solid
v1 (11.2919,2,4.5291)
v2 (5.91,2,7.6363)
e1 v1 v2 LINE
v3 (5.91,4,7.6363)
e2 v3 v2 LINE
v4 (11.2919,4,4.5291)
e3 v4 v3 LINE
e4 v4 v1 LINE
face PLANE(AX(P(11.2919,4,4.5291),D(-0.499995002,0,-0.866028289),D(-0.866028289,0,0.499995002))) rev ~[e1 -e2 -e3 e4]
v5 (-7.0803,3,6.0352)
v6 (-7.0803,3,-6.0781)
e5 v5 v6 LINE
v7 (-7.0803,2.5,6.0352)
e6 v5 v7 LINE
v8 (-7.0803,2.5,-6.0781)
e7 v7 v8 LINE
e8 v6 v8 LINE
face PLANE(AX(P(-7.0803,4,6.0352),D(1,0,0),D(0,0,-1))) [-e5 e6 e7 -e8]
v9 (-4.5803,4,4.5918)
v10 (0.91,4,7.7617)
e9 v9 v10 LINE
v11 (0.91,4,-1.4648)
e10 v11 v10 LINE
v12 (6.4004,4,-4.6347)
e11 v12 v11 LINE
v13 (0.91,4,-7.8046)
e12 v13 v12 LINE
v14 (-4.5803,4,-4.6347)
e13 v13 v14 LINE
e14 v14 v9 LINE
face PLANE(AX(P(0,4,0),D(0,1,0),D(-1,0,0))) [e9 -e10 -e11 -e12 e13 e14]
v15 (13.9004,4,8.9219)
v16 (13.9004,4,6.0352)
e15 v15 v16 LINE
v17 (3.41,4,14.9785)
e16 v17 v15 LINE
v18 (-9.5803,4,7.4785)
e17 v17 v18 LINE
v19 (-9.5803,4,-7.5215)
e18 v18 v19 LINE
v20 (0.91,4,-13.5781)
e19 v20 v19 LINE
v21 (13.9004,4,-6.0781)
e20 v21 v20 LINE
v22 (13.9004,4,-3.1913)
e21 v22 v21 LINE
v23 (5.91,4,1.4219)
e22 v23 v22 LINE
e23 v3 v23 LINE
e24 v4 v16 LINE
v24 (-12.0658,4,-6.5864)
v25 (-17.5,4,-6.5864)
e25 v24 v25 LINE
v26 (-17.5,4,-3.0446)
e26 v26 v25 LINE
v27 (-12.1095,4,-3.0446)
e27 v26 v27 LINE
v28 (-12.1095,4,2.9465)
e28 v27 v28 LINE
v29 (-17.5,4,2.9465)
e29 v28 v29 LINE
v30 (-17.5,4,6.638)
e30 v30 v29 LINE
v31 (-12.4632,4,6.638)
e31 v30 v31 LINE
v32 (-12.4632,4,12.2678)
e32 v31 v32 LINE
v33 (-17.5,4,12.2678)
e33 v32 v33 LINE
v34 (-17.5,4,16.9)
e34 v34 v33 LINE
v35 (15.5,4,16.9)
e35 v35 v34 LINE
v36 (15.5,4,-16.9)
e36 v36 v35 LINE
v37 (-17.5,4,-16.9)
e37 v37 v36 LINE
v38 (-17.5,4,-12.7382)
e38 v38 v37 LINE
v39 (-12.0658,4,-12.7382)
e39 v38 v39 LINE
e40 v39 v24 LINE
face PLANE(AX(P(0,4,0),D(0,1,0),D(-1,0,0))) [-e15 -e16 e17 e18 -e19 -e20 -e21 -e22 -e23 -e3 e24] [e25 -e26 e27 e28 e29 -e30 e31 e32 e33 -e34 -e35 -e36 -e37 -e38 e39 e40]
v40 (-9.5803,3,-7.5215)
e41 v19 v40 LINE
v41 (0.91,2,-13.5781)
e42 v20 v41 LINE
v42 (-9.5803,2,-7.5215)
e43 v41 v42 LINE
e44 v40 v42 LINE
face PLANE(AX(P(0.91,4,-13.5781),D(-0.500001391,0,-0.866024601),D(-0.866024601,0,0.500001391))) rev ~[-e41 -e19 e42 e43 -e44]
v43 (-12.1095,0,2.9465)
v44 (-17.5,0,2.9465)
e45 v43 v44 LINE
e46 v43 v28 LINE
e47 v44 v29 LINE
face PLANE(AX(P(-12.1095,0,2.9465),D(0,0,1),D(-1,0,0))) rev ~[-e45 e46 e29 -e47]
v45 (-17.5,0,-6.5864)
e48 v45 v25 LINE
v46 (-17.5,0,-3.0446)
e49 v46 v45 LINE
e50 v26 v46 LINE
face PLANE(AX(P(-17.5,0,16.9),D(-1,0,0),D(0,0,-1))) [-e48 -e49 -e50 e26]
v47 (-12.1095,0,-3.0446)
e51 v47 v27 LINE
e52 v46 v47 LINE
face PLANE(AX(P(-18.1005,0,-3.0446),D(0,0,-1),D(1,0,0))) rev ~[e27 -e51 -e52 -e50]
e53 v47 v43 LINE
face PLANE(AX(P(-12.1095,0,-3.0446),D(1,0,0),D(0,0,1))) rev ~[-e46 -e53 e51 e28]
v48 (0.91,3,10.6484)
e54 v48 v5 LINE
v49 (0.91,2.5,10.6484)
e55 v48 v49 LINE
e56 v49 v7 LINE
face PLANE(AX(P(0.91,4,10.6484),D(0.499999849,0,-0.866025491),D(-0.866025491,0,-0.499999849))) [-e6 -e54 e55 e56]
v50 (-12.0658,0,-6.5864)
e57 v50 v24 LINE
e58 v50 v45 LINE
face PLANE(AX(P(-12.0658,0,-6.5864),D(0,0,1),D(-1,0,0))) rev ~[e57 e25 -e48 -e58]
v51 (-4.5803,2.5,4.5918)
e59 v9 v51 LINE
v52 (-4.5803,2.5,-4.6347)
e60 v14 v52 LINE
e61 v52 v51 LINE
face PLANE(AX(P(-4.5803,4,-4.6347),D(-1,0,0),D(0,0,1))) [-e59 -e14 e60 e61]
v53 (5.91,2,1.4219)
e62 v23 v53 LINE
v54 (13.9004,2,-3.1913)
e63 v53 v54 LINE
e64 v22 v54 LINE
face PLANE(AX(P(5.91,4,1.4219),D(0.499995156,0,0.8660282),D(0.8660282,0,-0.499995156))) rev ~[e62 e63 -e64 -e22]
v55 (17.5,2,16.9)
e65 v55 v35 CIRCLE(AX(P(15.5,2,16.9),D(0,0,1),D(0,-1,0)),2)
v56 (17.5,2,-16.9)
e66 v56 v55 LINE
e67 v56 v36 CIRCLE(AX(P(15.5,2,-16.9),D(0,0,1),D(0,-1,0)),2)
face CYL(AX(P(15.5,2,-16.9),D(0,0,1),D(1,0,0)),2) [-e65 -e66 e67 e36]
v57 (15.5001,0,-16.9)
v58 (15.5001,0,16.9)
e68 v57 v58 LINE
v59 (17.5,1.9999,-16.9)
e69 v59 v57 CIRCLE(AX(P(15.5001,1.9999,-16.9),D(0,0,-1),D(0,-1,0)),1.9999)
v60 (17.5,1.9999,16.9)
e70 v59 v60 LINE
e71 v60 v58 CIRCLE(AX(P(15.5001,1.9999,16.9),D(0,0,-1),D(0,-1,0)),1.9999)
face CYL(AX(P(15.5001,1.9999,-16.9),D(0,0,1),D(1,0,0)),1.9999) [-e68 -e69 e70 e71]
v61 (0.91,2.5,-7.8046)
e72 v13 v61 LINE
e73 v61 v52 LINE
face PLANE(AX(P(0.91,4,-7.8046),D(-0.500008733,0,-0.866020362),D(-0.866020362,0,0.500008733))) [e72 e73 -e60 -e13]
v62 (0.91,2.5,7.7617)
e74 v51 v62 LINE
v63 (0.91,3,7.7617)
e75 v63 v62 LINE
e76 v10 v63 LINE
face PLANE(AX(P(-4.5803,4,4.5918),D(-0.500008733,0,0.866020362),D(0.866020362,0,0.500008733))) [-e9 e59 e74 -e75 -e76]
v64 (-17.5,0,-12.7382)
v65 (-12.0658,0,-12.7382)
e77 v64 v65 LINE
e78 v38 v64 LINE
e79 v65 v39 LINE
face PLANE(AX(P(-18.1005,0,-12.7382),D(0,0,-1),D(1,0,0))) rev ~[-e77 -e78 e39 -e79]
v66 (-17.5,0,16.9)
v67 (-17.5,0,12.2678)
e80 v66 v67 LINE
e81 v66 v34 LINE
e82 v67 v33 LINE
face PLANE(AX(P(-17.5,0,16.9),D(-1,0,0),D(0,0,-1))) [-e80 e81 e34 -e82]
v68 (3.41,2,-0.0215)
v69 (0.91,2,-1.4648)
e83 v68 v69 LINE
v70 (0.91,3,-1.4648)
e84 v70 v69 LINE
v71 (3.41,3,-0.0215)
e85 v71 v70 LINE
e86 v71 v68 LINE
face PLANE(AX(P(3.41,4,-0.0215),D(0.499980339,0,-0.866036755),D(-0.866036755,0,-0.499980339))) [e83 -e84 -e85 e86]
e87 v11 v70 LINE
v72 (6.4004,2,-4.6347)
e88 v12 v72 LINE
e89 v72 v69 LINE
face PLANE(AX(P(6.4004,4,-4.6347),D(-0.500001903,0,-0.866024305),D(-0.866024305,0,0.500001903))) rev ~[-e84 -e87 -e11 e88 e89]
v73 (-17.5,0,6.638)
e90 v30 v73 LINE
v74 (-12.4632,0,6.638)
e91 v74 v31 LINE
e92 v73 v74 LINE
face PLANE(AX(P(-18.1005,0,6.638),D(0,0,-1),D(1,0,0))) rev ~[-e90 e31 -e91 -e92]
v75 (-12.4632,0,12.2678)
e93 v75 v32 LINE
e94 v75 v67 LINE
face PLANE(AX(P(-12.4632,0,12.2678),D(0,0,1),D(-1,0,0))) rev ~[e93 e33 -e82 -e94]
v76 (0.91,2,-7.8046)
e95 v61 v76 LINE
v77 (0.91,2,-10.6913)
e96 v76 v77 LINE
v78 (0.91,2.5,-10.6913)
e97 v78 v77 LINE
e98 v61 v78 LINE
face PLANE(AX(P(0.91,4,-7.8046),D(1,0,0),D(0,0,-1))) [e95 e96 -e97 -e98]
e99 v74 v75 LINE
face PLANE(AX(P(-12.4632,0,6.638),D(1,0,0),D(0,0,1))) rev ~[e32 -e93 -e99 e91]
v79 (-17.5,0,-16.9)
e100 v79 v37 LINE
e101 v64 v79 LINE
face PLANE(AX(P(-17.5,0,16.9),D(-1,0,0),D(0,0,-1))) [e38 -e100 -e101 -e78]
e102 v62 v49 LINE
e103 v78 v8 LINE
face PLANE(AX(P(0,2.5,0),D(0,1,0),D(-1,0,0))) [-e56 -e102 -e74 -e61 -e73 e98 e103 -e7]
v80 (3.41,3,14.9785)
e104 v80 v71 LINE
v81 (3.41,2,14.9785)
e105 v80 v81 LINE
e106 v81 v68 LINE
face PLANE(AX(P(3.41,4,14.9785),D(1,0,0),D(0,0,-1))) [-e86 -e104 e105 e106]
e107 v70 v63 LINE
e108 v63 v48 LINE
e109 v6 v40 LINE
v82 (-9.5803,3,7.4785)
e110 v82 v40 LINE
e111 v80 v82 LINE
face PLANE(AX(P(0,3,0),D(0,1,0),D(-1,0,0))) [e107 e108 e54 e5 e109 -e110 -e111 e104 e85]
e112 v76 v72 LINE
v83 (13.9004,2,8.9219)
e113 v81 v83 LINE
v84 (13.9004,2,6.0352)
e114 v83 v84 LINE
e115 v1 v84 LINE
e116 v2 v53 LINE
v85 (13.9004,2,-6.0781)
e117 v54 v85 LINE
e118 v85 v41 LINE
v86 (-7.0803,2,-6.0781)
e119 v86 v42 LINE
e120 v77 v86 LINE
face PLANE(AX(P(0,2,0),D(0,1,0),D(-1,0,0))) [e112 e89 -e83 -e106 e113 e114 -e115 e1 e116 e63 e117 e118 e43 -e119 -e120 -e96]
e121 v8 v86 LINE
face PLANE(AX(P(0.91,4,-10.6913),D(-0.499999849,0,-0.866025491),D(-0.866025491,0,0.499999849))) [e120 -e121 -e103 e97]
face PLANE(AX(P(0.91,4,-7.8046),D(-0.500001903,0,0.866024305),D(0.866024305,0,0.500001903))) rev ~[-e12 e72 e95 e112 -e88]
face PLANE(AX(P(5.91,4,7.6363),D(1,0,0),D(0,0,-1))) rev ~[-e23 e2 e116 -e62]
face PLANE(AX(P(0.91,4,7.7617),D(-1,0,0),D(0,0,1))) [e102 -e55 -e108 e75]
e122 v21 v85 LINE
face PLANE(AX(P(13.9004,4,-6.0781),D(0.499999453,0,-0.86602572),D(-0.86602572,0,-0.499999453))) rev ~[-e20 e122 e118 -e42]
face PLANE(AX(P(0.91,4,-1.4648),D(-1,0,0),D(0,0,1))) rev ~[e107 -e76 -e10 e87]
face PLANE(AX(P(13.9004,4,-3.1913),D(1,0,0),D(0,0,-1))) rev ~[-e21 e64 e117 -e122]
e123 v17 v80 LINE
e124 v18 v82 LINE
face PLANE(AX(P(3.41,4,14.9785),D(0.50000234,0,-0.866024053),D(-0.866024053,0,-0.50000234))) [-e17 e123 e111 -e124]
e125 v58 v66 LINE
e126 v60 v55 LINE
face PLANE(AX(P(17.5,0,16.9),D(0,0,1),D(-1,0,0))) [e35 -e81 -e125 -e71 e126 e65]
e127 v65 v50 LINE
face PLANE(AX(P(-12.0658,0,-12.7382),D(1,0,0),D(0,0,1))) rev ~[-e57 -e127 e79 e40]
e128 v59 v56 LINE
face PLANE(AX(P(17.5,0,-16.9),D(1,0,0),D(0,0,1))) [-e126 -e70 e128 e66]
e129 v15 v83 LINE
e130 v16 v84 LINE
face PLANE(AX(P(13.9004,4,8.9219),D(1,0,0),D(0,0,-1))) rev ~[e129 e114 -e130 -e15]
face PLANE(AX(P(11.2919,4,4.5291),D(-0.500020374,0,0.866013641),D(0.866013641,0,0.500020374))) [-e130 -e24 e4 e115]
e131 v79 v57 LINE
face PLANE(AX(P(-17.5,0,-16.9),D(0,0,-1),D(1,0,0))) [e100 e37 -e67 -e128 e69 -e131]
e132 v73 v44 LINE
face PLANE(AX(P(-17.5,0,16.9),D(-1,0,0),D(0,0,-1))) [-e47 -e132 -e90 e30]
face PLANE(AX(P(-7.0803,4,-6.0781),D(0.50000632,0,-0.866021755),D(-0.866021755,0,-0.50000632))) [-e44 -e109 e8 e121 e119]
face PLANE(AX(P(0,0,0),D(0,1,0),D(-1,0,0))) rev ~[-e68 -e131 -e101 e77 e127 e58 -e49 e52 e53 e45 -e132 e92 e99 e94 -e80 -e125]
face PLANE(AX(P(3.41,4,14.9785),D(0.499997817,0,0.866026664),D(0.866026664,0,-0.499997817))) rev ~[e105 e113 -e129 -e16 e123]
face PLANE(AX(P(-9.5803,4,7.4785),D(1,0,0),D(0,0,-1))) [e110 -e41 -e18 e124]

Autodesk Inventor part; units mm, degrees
ref_plane "YZ Plane" through (0, 0, 0) normal (1, 0, 0) x (0, 1, 0)
ref_plane "XZ Plane" through (0, 0, 0) normal (0, 1, 0) x (-1, 0, 0)
ref_plane "XY Plane" through (0, 0, 0) normal (0, 0, 1) x (1, 0, 0)
sketch "Sketch1" plane through (0, 0, 0) normal (0, 1, 0) x (-1, 0, 0)
  line L0 (-17.5, 16.9) -> (17.5, 16.9)
  line L1 (17.5, 16.9) -> (17.5, -16.9)
  line L2 (17.5, -16.9) -> (-17.5, -16.9)
  line L3 (-17.5, -16.9) -> (-17.5, 16.9)
  line L4 (-17.5, 16.9) -> (17.5, -16.9) construction
  line L5 (17.5, 16.9) -> (-17.5, -16.9) construction
  point P0 (0, 0)
sketch "Sketch2" plane through (0, 0, 0) normal (0, 1, 0) x (-1, 0, 0)
  line L0 (980.2308, 0) -> (977.7308, 0)
  line L1 (17.4632, -0.049) -> (15.105, -0.049)
  line L2 (12.1095, 2.9465) -> (18.1005, 2.9465)
  line L3 (18.1005, 2.9465) -> (18.1005, -3.0446)
  line L4 (18.1005, -3.0446) -> (12.1095, -3.0446)
  line L5 (12.1095, -3.0446) -> (12.1095, 2.9465)
  line L6 (12.1095, 2.9465) -> (18.1005, -3.0446) construction
  line L7 (18.1005, 2.9465) -> (12.1095, -3.0446) construction
  line L8 (12.4632, 12.2678) -> (18.1005, 12.2678)
  line L9 (18.1005, 12.2678) -> (18.1005, 6.638)
  line L10 (18.1005, 6.638) -> (12.4632, 6.638)
  line L11 (12.4632, 6.638) -> (12.4632, 12.2678)
  line L12 (12.4632, 12.2678) -> (18.1005, 6.638) construction
  line L13 (12.0658, -6.5864) -> (18.1005, -6.5864)
  line L14 (18.1005, -6.5864) -> (18.1005, -12.7382)
  line L15 (18.1005, -12.7382) -> (12.0658, -12.7382)
  line L16 (12.0658, -12.7382) -> (12.0658, -6.5864)
  line L17 (12.0658, -6.5864) -> (18.1005, -12.7382) construction
  line L18 (18.1005, -6.5864) -> (12.0658, -12.7382) construction
  point P0 (0, 0)
  dimension "d2" = 2.5
extrude "Extrusion1" add sketch "Sketch1" along normal blind 4
extrude "Extrusion2" cut sketch "Sketch2" along normal blind 4
fillet "Fillet3" radius 2 1 edges at (17.5, 4, 0)
fillet "Fillet4" radius 2 1 edges at (17.5, 0, 0)
sketch "Sketch3" plane through (0, 4, 0) normal (0, 1, 0) x (1, 0, 0)
  line L0 (-17.5, 3.0446) -> (-12.1095, 3.0446) construction
  line L1 (-12.1095, 3.0446) -> (-12.1095, -2.9465) construction
  line L2 (-12.1095, -2.9465) -> (-17.5, -2.9465) construction
  line L3 (-17.5, -2.9465) -> (-17.5, -6.638) construction
  line L4 (-17.5, -6.638) -> (-12.4632, -6.638) construction
  line L5 (-12.4632, -6.638) -> (-12.4632, -12.2678) construction
  line L6 (-12.4632, -12.2678) -> (-17.5, -12.2678) construction
  line L7 (-17.5, -12.2678) -> (-17.5, -16.9) construction
  line L8 (-17.5, -16.9) -> (15.5, -16.9) construction
  line L9 (15.5, 16.9) -> (-17.5, 16.9) construction
  line L10 (-17.5, 16.9) -> (-17.5, 12.7382) construction
  line L11 (-17.5, 12.7382) -> (-12.0658, 12.7382) construction
  line L12 (-12.0658, 12.7382) -> (-12.0658, 6.5864) construction
  line L13 (-12.0658, 6.5864) -> (-17.5, 6.5864) construction
  line L14 (-17.5, 6.5864) -> (-17.5, 3.0446) construction
  line L15 (-12.1095, 0.049) -> (15.5, 0) construction
  line L16 (-17.5, 16.9) -> (17.5, 16.9) construction
  line L17 (17.5, -16.9) -> (-17.5, -16.9) construction
  line L18 (-9.5803, 7.5215) -> (-9.5803, -7.4785)
  line L19 (-9.5803, -7.4785) -> (3.41, -14.9785)
  line L20 (-9.5803, 7.5215) -> (-7.0803, 6.0781)
  line L21 (-7.0803, 6.0781) -> (-7.0803, -6.0352)
  line L22 (-7.0803, -6.0352) -> (0.91, -10.6484)
  line L23 (0.91, -10.6484) -> (0.91, 1.4648)
  line L24 (0.91, 1.4648) -> (3.41, 0.0215)
  line L25 (3.41, 0.0215) -> (3.41, -14.9785)
  line L26 (15.5, 16.9) -> (15.5, -16.9) projected
  line L27 (3.41, 16.9) -> (3.41, -16.9) construction
  line L28 (-17.5, -16.9) -> (15.5, -16.9) construction
  line L29 (15.5, 16.9) -> (15.5, 16.9) construction
  line L30 (15.5, 16.9) -> (15.5, -16.9) construction
  line L31 (15.5, -16.9) -> (15.5, -16.9) construction
  line L32 (15.5, -16.9) -> (15.5, 16.9) construction
  dimension "d23" = 2.5
  dimension "d24" = 2.5
  dimension "d25" = 2.5
  dimension "d26" = 15
  dimension "d28" = 15
emboss "Emboss1" sketch "Sketch3" operation cut depth 1 direction (0, -1, 0)
sketch "Sketch4" plane through (0, 4, 0) normal (0, 1, 0) x (1, 0, 0)
  line L0 (-9.5803, 7.5215) -> (-7.0803, 6.0781) construction
  line L1 (-7.0803, 6.0781) -> (-7.0803, -6.0352) construction
  line L2 (-7.0803, -6.0352) -> (0.91, -10.6484) construction
  line L3 (0.91, -10.6484) -> (0.91, 1.4648) construction
  line L4 (0.91, 1.4648) -> (3.41, 0.0215) construction
  line L5 (3.41, 0.0215) -> (3.41, -14.9785) construction
  line L6 (3.41, -14.9785) -> (-9.5803, -7.4785) construction
  line L7 (-9.5803, -7.4785) -> (-9.5803, 7.5215) construction
  line L8 (15.5, 16.9) -> (15.5, -16.9) construction
  line L9 (15.5, 16.9) -> (-17.5, 16.9) construction
  line L10 (-17.5, 16.9) -> (-17.5, 12.7382) construction
  line L11 (-17.5, 12.7382) -> (-12.0658, 12.7382) construction
  line L12 (-12.0658, 12.7382) -> (-12.0658, 6.5864) construction
  line L13 (-12.0658, 6.5864) -> (-17.5, 6.5864) construction
  line L14 (-17.5, 6.5864) -> (-17.5, 3.0446) construction
  line L15 (-17.5, 3.0446) -> (-12.1095, 3.0446) construction
  line L16 (-12.1095, 3.0446) -> (-12.1095, -2.9465) construction
  line L17 (-12.1095, -2.9465) -> (-17.5, -2.9465) construction
  line L18 (-17.5, -2.9465) -> (-17.5, -6.638) construction
  line L19 (-17.5, -6.638) -> (-12.4632, -6.638) construction
  line L20 (-12.4632, -6.638) -> (-12.4632, -12.2678) construction
  line L21 (-12.4632, -12.2678) -> (-17.5, -12.2678) construction
  line L22 (-17.5, -12.2678) -> (-17.5, -16.9) construction
  line L23 (-17.5, -16.9) -> (15.5, -16.9) construction
  line L24 (-12.1095, 0.049) -> (15.5, 0) construction
  line L25 (15.5, -16.9) -> (15.5, 16.9) construction
  line L26 (0.91, 16.9) -> (0.91, -16.9) construction
  line L27 (15.5, -16.9) -> (-17.5, -16.9) construction
  line L28 (0.91, -10.6484) -> (0.91, 1.4648) construction
  line L29 (-7.0803, 6.0781) -> (-7.0803, -6.0352) projected
  line L30 (-7.0803, -6.0352) -> (0.91, -10.6484) projected
  line L31 (-7.0803, 6.0781) -> (-7.0803, -6.0352)
  line L32 (-7.0803, -6.0352) -> (0.91, -10.6484)
  line L33 (0.91, -10.6484) -> (0.91, -7.7617)
  line L34 (0.91, -10.6484) -> (0.91, 1.4648) projected
  line L35 (0.91, -7.7617) -> (-4.5803, -4.5918)
  line L36 (-4.5803, -4.5918) -> (-4.5803, 4.6347)
  line L37 (-4.5803, 4.6347) -> (0.91, 7.8046)
  line L38 (-7.0803, 6.0781) -> (0.91, 10.6913)
  line L39 (0.91, 10.6913) -> (0.91, 7.8046)
  point P0 (0, 0)
  dimension "d29" = 120
  dimension "d30" = 2.5
  dimension "d31" = 2.5
  dimension "d32" = 2.5
emboss "Emboss2" sketch "Sketch4" operation cut depth 1.5 direction (0, -1, 0)
sketch "Sketch5" plane through (0, 4, 0) normal (0, 1, 0) x (1, 0, 0)
  line L0 (-4.5803, -4.5918) -> (0.91, -7.7617) construction
  line L1 (0.91, -7.7617) -> (0.91, 1.4648) construction
  line L2 (0.91, 1.4648) -> (3.41, 0.0215) construction
  line L3 (3.41, 0.0215) -> (3.41, -14.9785) construction
  line L4 (3.41, -14.9785) -> (-9.5803, -7.4785) construction
  line L5 (-9.5803, -7.4785) -> (-9.5803, 7.5215) construction
  line L6 (-9.5803, 7.5215) -> (-7.0803, 6.0781) construction
  line L7 (-7.0803, 6.0781) -> (0.91, 10.6913) construction
  line L8 (0.91, 10.6913) -> (0.91, 7.8046) construction
  line L9 (0.91, 7.8046) -> (-4.5803, 4.6347) construction
  line L10 (-4.5803, 4.6347) -> (-4.5803, -4.5918) construction
  line L11 (15.5, 16.9) -> (15.5, -16.9) construction
  line L12 (15.5, 16.9) -> (-17.5, 16.9) construction
  line L13 (-17.5, 16.9) -> (-17.5, 12.7382) construction
  line L14 (-17.5, 12.7382) -> (-12.0658, 12.7382) construction
  line L15 (-12.0658, 12.7382) -> (-12.0658, 6.5864) construction
  line L16 (-12.0658, 6.5864) -> (-17.5, 6.5864) construction
  line L17 (-17.5, 6.5864) -> (-17.5, 3.0446) construction
  line L18 (-17.5, 3.0446) -> (-12.1095, 3.0446) construction
  line L19 (-12.1095, 3.0446) -> (-12.1095, -2.9465) construction
  line L20 (-12.1095, -2.9465) -> (-17.5, -2.9465) construction
  line L21 (-17.5, -2.9465) -> (-17.5, -6.638) construction
  line L22 (-17.5, -6.638) -> (-12.4632, -6.638) construction
  line L23 (-12.4632, -6.638) -> (-12.4632, -12.2678) construction
  line L24 (-12.4632, -12.2678) -> (-17.5, -12.2678) construction
  line L25 (-17.5, -12.2678) -> (-17.5, -16.9) construction
  line L26 (-17.5, -16.9) -> (15.5, -16.9) construction
  line L27 (-7.0803, 6.0781) -> (0.91, 10.6913) projected
  line L28 (-9.5803, 7.5215) -> (-7.0803, 6.0781)
  line L29 (-7.0803, 6.0781) -> (0.91, 10.6913)
  line L30 (0.91, 10.6913) -> (0.91, 7.8046)
  line L31 (0.91, 10.6913) -> (0.91, 7.8046) projected
  line L32 (0.91, 16.9) -> (0.91, -16.9) construction
  line L33 (0.91, -7.7617) -> (0.91, 1.4648) construction
  line L34 (-9.5803, 7.5215) -> (0.91, 13.5781)
  line L35 (0.91, 13.5781) -> (13.9004, 6.0781)
  line L36 (13.9004, 6.0781) -> (13.9004, 3.1913)
  line L37 (13.9004, 3.1913) -> (5.91, -1.4219)
  line L38 (5.91, -1.4219) -> (5.91, -7.6363)
  line L39 (5.91, -7.6363) -> (11.2919, -4.5291)
  line L40 (13.9004, -6.0352) -> (13.9004, -8.9219)
  line L41 (3.41, -14.9785) -> (-9.5803, -7.4785) projected
  line L42 (13.9004, -8.9219) -> (3.41, -14.9785)
  line L43 (0.91, 1.4648) -> (3.41, 0.0215) projected
  line L44 (3.41, -14.9785) -> (3.41, 0.0215)
  line L45 (3.41, 0.0215) -> (0.91, 1.4648)
  line L46 (0.91, 7.8046) -> (-4.5803, 4.6347) projected
  line L47 (0.91, 7.8046) -> (0.91, 10.6913)
  line L48 (3.41, 0.0215) -> (3.41, -14.9785) projected
  line L49 (0.91, 1.4648) -> (6.4004, 4.6347)
  line L50 (6.4004, 4.6347) -> (0.91, 7.8046)
  line L51 (13.9004, -6.0352) -> (11.2919, -4.5291)
  line L52 (-7.1521, -6.1594) -> (3.41, -12.0918) construction
  line L53 (-4.5803, -4.5918) -> (0.91, -7.7617) construction
  line L54 (-4.5803, -4.5918) -> (3.41, -9.0797) construction
  line L55 (3.41, -9.0797) -> (14.5341, -2.6572) construction
  line L56 (3.41, 0.0215) -> (13.9004, 6.0781) construction
  line L57 (3.41, -12.0918) -> (19.1495, -3.0046) construction
  line L58 (6.4004, 4.6347) -> (9.227, 5.8895) construction
  line L59 (0.91, 10.6913) -> (0.91, 7.8046) construction
  line L60 (9.227, 5.8895) -> (0.91, 10.6913) construction
  point P0 (0, 0)
  dimension "d35" = 60
  dimension "d36" = 2.5
  dimension "d39" = 120
  dimension "d42" = 120
  dimension "d43" = 2.5
emboss "Emboss3" sketch "Sketch5" operation cut depth 2 direction (0, -1, 0)
equation "\"d24\" = d23"
equation "\"d25\" = d23"
equation "\"d28\" = d26"
equation "\"d30\" = d23"
equation "\"d31\" = d23"
equation "\"d32\" = d23"
equation "\"d36\" = d23"
equation "\"d43\" = d23"
properties part number "schablone"
